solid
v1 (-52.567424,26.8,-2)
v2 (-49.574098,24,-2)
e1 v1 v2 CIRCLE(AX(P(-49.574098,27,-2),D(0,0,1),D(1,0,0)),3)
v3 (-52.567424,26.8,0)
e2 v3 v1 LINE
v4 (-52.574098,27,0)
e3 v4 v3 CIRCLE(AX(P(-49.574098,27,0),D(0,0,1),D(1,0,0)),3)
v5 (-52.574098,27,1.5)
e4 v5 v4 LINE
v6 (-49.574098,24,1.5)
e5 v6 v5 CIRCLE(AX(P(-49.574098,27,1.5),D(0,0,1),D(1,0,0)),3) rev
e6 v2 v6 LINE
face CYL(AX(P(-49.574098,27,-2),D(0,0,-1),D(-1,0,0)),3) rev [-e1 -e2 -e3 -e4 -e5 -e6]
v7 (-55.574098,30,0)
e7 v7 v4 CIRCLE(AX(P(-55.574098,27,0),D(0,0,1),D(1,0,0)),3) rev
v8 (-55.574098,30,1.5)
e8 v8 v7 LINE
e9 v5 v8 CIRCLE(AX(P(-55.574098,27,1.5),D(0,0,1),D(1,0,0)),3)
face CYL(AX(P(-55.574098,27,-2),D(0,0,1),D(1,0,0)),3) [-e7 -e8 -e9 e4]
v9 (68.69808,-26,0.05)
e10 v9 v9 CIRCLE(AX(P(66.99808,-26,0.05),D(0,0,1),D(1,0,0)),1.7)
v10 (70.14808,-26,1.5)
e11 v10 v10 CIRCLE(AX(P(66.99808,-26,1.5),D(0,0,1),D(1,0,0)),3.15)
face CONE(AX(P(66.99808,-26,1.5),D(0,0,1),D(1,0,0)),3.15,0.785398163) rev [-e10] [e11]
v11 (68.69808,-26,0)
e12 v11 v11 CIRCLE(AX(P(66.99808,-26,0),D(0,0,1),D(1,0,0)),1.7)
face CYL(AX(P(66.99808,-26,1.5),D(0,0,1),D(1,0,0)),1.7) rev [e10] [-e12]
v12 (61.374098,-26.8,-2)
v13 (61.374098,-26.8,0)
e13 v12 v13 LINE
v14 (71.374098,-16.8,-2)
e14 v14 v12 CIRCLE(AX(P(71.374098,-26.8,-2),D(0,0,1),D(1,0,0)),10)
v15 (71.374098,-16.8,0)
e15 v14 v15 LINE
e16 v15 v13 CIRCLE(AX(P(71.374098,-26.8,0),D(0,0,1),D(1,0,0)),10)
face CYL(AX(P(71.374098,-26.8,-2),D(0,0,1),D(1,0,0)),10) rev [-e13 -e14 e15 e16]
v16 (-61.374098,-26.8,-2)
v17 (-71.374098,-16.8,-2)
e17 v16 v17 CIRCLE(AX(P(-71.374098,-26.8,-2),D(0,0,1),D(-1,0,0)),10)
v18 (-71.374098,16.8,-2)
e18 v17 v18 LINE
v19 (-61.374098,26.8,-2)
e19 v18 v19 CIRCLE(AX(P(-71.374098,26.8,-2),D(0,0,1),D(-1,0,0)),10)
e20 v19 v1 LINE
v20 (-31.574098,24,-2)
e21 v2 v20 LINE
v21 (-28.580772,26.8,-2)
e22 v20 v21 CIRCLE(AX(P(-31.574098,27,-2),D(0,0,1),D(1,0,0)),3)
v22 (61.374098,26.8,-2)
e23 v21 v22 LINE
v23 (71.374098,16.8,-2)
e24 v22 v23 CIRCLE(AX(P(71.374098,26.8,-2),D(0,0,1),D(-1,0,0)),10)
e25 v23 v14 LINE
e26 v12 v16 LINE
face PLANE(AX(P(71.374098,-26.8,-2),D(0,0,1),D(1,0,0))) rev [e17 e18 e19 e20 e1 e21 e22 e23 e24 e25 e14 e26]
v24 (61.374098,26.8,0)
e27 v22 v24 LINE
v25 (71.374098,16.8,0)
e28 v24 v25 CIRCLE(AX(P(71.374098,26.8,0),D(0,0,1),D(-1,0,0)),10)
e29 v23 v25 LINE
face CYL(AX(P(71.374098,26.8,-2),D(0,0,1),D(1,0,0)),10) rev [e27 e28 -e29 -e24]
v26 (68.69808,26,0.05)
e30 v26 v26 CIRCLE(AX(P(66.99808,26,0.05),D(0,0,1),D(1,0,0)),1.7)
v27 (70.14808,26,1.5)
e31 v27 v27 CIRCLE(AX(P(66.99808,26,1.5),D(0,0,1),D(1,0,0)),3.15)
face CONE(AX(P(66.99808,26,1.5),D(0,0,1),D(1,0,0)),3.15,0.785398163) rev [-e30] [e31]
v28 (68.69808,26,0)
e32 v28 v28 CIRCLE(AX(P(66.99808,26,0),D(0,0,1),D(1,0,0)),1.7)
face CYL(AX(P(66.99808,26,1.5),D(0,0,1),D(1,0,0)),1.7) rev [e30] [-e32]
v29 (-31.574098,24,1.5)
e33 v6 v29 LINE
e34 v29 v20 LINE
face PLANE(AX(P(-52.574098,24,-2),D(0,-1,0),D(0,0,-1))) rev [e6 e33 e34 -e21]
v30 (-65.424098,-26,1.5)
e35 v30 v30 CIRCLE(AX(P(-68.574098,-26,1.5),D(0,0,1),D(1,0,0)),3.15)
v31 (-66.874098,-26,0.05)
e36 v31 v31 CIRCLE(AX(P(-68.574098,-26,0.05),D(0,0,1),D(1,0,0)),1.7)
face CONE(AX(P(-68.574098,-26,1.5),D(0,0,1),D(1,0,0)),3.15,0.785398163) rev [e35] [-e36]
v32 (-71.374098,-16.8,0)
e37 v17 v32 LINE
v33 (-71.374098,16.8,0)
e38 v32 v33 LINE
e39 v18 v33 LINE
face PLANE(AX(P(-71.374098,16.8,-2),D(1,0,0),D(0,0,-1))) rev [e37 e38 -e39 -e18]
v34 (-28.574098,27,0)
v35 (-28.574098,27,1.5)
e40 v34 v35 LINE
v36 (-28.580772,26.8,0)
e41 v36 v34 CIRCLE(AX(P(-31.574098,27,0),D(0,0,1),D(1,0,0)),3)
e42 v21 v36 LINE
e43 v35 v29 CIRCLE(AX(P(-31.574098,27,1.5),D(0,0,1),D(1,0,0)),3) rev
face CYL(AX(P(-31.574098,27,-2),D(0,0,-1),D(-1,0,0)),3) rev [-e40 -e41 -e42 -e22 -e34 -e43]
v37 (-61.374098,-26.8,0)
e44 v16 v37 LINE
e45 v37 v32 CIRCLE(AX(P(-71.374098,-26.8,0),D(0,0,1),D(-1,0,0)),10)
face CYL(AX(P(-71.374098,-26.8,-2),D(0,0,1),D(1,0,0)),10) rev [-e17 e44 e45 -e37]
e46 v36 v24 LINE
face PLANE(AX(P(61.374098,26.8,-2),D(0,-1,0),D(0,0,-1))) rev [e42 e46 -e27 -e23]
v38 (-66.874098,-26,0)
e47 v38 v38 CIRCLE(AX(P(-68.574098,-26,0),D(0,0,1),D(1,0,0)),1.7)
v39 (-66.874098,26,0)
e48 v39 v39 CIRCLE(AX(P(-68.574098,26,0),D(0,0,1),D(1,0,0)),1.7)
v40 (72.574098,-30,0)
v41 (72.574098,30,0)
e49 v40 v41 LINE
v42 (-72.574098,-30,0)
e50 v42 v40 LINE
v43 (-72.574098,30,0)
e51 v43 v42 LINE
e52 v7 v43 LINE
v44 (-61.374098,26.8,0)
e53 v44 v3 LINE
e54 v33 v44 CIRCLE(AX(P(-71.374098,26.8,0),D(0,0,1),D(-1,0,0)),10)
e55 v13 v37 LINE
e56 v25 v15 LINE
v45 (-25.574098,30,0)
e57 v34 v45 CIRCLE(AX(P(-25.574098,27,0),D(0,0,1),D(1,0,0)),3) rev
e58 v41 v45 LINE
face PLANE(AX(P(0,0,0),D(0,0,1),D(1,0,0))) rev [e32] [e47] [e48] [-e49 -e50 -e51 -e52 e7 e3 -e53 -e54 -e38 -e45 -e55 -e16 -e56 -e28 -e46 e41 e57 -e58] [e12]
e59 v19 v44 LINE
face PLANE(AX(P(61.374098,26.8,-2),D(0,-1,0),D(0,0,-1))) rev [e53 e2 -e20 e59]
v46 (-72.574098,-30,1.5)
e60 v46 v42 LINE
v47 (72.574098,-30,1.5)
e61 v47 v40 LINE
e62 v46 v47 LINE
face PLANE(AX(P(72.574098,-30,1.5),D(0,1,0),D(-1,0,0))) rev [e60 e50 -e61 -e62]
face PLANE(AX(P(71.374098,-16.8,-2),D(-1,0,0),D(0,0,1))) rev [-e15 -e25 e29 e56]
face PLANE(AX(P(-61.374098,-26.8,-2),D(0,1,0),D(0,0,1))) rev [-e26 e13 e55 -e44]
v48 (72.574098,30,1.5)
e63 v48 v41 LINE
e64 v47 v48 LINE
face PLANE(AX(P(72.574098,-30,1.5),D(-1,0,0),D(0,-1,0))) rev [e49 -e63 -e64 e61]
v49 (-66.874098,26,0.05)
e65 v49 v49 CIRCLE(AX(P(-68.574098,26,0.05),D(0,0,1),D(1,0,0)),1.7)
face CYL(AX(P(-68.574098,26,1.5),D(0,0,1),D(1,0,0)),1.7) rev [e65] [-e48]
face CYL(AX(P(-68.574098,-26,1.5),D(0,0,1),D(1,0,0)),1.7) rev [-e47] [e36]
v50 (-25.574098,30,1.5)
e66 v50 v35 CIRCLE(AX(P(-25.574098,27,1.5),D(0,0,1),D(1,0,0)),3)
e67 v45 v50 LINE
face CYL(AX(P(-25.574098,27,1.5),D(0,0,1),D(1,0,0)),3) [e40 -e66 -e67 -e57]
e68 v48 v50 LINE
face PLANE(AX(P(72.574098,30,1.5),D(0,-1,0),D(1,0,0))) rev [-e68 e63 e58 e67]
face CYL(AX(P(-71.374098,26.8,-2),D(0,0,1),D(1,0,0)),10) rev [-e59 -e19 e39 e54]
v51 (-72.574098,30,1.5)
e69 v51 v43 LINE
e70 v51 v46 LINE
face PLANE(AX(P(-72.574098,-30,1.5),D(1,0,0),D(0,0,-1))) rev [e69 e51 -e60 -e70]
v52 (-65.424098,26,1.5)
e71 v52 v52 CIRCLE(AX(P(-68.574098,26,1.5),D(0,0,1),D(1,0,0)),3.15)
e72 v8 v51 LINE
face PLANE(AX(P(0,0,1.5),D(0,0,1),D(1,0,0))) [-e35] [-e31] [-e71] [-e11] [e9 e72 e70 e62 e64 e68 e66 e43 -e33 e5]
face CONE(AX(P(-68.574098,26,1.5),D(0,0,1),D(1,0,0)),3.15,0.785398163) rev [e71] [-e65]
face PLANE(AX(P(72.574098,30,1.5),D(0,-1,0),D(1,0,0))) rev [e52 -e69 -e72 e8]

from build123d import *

# Parameters (mm, degrees)
ESQUISSE1_W                                 = 145.148196
ESQUISSE1_H                                 = 60
BOSS_EXTRU_1_DEPTH                          = 1.5
BOSS_EXTRU_2_DEPTH                          = 2
FRAISAGE_POUR_VIS_T_TE_FRAIS_E_M31_AT_COUNT = 2
FRAISAGE_POUR_VIS_T_TE_FRAIS_E_M31_AT_PITCH = 52
FRAISAGE_POUR_VIS_T_TE_FRAIS_E_M31_2_COUNT  = 2
FRAISAGE_POUR_VIS_T_TE_FRAIS_E_M31_2_PITCH  = 135.572178
FRAISAGE_POUR_VIS_T_TE_FRAIS_E_M31_3_COUNT  = 2
FRAISAGE_POUR_VIS_T_TE_FRAIS_E_M31_3_PITCH  = 145.20267025
ENL_V_MAT_EXTRU_1_DEPTH                     = 79.608203774
ENL_V_MAT_EXTRU_1_DEPTH_BACK                = 79.608203774
ESQUISSE6_W                                 = 24
ESQUISSE6_H                                 = 6
CONG_1_R                                    = 3


with BuildPart() as part:
    # Esquisse1 → Boss.-Extru.1 (new body)
    with BuildSketch(Plane.XY):
        Rectangle(ESQUISSE1_W, ESQUISSE1_H)
    extrude(amount=BOSS_EXTRU_1_DEPTH)

    # Esquisse2 → Boss.-Extru.2 (add)
    with BuildSketch(Plane(origin=(0, 0, 0), x_dir=(-1, 0, 0), z_dir=(0, 0, -1))):
        with BuildLine():
            Line((-71.374098, -16.8), (-71.374098, 16.8))
            ThreePointArc((-71.374098, 16.8), (-64.303030188, 19.728932188), (-61.374098, 26.8))
            Line((-61.374098, 26.8), (61.374098, 26.8))
            ThreePointArc((61.374098, 26.8), (64.303030188, 19.728932188), (71.374098, 16.8))
            Line((71.374098, 16.8), (71.374098, -16.8))
            ThreePointArc((71.374098, -16.8), (64.303030188, -19.728932188), (61.374098, -26.8))
            Line((61.374098, -26.8), (-61.374098, -26.8))
            ThreePointArc((-61.374098, -26.8), (-64.303030188, -19.728932188), (-71.374098, -16.8))
        make_face()
    extrude(amount=BOSS_EXTRU_2_DEPTH)

    # Esquisse5 → Fraisage pour vis à tête fraisée M31 (revolve, cut)
    with BuildSketch(Plane(origin=(-68.574098, 26, 1.5), x_dir=(0, -1, 0), z_dir=(1, 0, 0))):
        Polygon((0, 0), (0, 1.5), (1.7, 1.5), (1.7, 1.45), (3.15, 0), align=None)
    fraisage_pour_vis_t_te_frais_e_m31 = revolve(axis=Axis((-68.574098, 26, 7.85), (0, 0, -1)), mode=Mode.SUBTRACT)

    # Fraisage pour vis à tête fraisée M31 at: Fraisage pour vis à tête fraisée M31 ×2
    with Locations(*[(0, -i * FRAISAGE_POUR_VIS_T_TE_FRAIS_E_M31_AT_PITCH, 0) for i in range(1, FRAISAGE_POUR_VIS_T_TE_FRAIS_E_M31_AT_COUNT)]):
        add(fraisage_pour_vis_t_te_frais_e_m31, mode=Mode.SUBTRACT)

    # Fraisage pour vis _ t_te frais_e M31 2: Fraisage pour vis à tête fraisée M31 ×2
    with Locations(*[(i * FRAISAGE_POUR_VIS_T_TE_FRAIS_E_M31_2_PITCH, 0, 0) for i in range(1, FRAISAGE_POUR_VIS_T_TE_FRAIS_E_M31_2_COUNT)]):
        add(fraisage_pour_vis_t_te_frais_e_m31, mode=Mode.SUBTRACT)

    # Fraisage pour vis _ t_te frais_e M31 3: Fraisage pour vis à tête fraisée M31 ×2
    with Locations(*[Vector(0.9336755155176905, -0.35812013588009123, 0) * (i * FRAISAGE_POUR_VIS_T_TE_FRAIS_E_M31_3_PITCH) for i in range(1, FRAISAGE_POUR_VIS_T_TE_FRAIS_E_M31_3_COUNT)]):
        add(fraisage_pour_vis_t_te_frais_e_m31, mode=Mode.SUBTRACT)

    # Esquisse6 → Enlèv. mat.-Extru.1 (cut, two sides: drawn at the far end of the back side and taken through both)
    with BuildSketch(Plane.XY.offset(1.5).offset(-ENL_V_MAT_EXTRU_1_DEPTH_BACK)):
        with Locations((-40.574098, 27)):
            Rectangle(ESQUISSE6_W, ESQUISSE6_H)
    extrude(amount=ENL_V_MAT_EXTRU_1_DEPTH + ENL_V_MAT_EXTRU_1_DEPTH_BACK, mode=Mode.SUBTRACT)

    # Congé1
    cong_1_edges = [part.edges().sort_by_distance(p)[0] for p in [
        (-28.574098, 30, 0.75),
        (-28.574098, 24, -0.25),
        (-52.574098, 30, 0.75),
        (-52.574098, 24, -0.25),
    ]]
    fillet(cong_1_edges, radius=CONG_1_R - 0.0001)  # a hair under: the kernel refuses the full size


solid = part.part
